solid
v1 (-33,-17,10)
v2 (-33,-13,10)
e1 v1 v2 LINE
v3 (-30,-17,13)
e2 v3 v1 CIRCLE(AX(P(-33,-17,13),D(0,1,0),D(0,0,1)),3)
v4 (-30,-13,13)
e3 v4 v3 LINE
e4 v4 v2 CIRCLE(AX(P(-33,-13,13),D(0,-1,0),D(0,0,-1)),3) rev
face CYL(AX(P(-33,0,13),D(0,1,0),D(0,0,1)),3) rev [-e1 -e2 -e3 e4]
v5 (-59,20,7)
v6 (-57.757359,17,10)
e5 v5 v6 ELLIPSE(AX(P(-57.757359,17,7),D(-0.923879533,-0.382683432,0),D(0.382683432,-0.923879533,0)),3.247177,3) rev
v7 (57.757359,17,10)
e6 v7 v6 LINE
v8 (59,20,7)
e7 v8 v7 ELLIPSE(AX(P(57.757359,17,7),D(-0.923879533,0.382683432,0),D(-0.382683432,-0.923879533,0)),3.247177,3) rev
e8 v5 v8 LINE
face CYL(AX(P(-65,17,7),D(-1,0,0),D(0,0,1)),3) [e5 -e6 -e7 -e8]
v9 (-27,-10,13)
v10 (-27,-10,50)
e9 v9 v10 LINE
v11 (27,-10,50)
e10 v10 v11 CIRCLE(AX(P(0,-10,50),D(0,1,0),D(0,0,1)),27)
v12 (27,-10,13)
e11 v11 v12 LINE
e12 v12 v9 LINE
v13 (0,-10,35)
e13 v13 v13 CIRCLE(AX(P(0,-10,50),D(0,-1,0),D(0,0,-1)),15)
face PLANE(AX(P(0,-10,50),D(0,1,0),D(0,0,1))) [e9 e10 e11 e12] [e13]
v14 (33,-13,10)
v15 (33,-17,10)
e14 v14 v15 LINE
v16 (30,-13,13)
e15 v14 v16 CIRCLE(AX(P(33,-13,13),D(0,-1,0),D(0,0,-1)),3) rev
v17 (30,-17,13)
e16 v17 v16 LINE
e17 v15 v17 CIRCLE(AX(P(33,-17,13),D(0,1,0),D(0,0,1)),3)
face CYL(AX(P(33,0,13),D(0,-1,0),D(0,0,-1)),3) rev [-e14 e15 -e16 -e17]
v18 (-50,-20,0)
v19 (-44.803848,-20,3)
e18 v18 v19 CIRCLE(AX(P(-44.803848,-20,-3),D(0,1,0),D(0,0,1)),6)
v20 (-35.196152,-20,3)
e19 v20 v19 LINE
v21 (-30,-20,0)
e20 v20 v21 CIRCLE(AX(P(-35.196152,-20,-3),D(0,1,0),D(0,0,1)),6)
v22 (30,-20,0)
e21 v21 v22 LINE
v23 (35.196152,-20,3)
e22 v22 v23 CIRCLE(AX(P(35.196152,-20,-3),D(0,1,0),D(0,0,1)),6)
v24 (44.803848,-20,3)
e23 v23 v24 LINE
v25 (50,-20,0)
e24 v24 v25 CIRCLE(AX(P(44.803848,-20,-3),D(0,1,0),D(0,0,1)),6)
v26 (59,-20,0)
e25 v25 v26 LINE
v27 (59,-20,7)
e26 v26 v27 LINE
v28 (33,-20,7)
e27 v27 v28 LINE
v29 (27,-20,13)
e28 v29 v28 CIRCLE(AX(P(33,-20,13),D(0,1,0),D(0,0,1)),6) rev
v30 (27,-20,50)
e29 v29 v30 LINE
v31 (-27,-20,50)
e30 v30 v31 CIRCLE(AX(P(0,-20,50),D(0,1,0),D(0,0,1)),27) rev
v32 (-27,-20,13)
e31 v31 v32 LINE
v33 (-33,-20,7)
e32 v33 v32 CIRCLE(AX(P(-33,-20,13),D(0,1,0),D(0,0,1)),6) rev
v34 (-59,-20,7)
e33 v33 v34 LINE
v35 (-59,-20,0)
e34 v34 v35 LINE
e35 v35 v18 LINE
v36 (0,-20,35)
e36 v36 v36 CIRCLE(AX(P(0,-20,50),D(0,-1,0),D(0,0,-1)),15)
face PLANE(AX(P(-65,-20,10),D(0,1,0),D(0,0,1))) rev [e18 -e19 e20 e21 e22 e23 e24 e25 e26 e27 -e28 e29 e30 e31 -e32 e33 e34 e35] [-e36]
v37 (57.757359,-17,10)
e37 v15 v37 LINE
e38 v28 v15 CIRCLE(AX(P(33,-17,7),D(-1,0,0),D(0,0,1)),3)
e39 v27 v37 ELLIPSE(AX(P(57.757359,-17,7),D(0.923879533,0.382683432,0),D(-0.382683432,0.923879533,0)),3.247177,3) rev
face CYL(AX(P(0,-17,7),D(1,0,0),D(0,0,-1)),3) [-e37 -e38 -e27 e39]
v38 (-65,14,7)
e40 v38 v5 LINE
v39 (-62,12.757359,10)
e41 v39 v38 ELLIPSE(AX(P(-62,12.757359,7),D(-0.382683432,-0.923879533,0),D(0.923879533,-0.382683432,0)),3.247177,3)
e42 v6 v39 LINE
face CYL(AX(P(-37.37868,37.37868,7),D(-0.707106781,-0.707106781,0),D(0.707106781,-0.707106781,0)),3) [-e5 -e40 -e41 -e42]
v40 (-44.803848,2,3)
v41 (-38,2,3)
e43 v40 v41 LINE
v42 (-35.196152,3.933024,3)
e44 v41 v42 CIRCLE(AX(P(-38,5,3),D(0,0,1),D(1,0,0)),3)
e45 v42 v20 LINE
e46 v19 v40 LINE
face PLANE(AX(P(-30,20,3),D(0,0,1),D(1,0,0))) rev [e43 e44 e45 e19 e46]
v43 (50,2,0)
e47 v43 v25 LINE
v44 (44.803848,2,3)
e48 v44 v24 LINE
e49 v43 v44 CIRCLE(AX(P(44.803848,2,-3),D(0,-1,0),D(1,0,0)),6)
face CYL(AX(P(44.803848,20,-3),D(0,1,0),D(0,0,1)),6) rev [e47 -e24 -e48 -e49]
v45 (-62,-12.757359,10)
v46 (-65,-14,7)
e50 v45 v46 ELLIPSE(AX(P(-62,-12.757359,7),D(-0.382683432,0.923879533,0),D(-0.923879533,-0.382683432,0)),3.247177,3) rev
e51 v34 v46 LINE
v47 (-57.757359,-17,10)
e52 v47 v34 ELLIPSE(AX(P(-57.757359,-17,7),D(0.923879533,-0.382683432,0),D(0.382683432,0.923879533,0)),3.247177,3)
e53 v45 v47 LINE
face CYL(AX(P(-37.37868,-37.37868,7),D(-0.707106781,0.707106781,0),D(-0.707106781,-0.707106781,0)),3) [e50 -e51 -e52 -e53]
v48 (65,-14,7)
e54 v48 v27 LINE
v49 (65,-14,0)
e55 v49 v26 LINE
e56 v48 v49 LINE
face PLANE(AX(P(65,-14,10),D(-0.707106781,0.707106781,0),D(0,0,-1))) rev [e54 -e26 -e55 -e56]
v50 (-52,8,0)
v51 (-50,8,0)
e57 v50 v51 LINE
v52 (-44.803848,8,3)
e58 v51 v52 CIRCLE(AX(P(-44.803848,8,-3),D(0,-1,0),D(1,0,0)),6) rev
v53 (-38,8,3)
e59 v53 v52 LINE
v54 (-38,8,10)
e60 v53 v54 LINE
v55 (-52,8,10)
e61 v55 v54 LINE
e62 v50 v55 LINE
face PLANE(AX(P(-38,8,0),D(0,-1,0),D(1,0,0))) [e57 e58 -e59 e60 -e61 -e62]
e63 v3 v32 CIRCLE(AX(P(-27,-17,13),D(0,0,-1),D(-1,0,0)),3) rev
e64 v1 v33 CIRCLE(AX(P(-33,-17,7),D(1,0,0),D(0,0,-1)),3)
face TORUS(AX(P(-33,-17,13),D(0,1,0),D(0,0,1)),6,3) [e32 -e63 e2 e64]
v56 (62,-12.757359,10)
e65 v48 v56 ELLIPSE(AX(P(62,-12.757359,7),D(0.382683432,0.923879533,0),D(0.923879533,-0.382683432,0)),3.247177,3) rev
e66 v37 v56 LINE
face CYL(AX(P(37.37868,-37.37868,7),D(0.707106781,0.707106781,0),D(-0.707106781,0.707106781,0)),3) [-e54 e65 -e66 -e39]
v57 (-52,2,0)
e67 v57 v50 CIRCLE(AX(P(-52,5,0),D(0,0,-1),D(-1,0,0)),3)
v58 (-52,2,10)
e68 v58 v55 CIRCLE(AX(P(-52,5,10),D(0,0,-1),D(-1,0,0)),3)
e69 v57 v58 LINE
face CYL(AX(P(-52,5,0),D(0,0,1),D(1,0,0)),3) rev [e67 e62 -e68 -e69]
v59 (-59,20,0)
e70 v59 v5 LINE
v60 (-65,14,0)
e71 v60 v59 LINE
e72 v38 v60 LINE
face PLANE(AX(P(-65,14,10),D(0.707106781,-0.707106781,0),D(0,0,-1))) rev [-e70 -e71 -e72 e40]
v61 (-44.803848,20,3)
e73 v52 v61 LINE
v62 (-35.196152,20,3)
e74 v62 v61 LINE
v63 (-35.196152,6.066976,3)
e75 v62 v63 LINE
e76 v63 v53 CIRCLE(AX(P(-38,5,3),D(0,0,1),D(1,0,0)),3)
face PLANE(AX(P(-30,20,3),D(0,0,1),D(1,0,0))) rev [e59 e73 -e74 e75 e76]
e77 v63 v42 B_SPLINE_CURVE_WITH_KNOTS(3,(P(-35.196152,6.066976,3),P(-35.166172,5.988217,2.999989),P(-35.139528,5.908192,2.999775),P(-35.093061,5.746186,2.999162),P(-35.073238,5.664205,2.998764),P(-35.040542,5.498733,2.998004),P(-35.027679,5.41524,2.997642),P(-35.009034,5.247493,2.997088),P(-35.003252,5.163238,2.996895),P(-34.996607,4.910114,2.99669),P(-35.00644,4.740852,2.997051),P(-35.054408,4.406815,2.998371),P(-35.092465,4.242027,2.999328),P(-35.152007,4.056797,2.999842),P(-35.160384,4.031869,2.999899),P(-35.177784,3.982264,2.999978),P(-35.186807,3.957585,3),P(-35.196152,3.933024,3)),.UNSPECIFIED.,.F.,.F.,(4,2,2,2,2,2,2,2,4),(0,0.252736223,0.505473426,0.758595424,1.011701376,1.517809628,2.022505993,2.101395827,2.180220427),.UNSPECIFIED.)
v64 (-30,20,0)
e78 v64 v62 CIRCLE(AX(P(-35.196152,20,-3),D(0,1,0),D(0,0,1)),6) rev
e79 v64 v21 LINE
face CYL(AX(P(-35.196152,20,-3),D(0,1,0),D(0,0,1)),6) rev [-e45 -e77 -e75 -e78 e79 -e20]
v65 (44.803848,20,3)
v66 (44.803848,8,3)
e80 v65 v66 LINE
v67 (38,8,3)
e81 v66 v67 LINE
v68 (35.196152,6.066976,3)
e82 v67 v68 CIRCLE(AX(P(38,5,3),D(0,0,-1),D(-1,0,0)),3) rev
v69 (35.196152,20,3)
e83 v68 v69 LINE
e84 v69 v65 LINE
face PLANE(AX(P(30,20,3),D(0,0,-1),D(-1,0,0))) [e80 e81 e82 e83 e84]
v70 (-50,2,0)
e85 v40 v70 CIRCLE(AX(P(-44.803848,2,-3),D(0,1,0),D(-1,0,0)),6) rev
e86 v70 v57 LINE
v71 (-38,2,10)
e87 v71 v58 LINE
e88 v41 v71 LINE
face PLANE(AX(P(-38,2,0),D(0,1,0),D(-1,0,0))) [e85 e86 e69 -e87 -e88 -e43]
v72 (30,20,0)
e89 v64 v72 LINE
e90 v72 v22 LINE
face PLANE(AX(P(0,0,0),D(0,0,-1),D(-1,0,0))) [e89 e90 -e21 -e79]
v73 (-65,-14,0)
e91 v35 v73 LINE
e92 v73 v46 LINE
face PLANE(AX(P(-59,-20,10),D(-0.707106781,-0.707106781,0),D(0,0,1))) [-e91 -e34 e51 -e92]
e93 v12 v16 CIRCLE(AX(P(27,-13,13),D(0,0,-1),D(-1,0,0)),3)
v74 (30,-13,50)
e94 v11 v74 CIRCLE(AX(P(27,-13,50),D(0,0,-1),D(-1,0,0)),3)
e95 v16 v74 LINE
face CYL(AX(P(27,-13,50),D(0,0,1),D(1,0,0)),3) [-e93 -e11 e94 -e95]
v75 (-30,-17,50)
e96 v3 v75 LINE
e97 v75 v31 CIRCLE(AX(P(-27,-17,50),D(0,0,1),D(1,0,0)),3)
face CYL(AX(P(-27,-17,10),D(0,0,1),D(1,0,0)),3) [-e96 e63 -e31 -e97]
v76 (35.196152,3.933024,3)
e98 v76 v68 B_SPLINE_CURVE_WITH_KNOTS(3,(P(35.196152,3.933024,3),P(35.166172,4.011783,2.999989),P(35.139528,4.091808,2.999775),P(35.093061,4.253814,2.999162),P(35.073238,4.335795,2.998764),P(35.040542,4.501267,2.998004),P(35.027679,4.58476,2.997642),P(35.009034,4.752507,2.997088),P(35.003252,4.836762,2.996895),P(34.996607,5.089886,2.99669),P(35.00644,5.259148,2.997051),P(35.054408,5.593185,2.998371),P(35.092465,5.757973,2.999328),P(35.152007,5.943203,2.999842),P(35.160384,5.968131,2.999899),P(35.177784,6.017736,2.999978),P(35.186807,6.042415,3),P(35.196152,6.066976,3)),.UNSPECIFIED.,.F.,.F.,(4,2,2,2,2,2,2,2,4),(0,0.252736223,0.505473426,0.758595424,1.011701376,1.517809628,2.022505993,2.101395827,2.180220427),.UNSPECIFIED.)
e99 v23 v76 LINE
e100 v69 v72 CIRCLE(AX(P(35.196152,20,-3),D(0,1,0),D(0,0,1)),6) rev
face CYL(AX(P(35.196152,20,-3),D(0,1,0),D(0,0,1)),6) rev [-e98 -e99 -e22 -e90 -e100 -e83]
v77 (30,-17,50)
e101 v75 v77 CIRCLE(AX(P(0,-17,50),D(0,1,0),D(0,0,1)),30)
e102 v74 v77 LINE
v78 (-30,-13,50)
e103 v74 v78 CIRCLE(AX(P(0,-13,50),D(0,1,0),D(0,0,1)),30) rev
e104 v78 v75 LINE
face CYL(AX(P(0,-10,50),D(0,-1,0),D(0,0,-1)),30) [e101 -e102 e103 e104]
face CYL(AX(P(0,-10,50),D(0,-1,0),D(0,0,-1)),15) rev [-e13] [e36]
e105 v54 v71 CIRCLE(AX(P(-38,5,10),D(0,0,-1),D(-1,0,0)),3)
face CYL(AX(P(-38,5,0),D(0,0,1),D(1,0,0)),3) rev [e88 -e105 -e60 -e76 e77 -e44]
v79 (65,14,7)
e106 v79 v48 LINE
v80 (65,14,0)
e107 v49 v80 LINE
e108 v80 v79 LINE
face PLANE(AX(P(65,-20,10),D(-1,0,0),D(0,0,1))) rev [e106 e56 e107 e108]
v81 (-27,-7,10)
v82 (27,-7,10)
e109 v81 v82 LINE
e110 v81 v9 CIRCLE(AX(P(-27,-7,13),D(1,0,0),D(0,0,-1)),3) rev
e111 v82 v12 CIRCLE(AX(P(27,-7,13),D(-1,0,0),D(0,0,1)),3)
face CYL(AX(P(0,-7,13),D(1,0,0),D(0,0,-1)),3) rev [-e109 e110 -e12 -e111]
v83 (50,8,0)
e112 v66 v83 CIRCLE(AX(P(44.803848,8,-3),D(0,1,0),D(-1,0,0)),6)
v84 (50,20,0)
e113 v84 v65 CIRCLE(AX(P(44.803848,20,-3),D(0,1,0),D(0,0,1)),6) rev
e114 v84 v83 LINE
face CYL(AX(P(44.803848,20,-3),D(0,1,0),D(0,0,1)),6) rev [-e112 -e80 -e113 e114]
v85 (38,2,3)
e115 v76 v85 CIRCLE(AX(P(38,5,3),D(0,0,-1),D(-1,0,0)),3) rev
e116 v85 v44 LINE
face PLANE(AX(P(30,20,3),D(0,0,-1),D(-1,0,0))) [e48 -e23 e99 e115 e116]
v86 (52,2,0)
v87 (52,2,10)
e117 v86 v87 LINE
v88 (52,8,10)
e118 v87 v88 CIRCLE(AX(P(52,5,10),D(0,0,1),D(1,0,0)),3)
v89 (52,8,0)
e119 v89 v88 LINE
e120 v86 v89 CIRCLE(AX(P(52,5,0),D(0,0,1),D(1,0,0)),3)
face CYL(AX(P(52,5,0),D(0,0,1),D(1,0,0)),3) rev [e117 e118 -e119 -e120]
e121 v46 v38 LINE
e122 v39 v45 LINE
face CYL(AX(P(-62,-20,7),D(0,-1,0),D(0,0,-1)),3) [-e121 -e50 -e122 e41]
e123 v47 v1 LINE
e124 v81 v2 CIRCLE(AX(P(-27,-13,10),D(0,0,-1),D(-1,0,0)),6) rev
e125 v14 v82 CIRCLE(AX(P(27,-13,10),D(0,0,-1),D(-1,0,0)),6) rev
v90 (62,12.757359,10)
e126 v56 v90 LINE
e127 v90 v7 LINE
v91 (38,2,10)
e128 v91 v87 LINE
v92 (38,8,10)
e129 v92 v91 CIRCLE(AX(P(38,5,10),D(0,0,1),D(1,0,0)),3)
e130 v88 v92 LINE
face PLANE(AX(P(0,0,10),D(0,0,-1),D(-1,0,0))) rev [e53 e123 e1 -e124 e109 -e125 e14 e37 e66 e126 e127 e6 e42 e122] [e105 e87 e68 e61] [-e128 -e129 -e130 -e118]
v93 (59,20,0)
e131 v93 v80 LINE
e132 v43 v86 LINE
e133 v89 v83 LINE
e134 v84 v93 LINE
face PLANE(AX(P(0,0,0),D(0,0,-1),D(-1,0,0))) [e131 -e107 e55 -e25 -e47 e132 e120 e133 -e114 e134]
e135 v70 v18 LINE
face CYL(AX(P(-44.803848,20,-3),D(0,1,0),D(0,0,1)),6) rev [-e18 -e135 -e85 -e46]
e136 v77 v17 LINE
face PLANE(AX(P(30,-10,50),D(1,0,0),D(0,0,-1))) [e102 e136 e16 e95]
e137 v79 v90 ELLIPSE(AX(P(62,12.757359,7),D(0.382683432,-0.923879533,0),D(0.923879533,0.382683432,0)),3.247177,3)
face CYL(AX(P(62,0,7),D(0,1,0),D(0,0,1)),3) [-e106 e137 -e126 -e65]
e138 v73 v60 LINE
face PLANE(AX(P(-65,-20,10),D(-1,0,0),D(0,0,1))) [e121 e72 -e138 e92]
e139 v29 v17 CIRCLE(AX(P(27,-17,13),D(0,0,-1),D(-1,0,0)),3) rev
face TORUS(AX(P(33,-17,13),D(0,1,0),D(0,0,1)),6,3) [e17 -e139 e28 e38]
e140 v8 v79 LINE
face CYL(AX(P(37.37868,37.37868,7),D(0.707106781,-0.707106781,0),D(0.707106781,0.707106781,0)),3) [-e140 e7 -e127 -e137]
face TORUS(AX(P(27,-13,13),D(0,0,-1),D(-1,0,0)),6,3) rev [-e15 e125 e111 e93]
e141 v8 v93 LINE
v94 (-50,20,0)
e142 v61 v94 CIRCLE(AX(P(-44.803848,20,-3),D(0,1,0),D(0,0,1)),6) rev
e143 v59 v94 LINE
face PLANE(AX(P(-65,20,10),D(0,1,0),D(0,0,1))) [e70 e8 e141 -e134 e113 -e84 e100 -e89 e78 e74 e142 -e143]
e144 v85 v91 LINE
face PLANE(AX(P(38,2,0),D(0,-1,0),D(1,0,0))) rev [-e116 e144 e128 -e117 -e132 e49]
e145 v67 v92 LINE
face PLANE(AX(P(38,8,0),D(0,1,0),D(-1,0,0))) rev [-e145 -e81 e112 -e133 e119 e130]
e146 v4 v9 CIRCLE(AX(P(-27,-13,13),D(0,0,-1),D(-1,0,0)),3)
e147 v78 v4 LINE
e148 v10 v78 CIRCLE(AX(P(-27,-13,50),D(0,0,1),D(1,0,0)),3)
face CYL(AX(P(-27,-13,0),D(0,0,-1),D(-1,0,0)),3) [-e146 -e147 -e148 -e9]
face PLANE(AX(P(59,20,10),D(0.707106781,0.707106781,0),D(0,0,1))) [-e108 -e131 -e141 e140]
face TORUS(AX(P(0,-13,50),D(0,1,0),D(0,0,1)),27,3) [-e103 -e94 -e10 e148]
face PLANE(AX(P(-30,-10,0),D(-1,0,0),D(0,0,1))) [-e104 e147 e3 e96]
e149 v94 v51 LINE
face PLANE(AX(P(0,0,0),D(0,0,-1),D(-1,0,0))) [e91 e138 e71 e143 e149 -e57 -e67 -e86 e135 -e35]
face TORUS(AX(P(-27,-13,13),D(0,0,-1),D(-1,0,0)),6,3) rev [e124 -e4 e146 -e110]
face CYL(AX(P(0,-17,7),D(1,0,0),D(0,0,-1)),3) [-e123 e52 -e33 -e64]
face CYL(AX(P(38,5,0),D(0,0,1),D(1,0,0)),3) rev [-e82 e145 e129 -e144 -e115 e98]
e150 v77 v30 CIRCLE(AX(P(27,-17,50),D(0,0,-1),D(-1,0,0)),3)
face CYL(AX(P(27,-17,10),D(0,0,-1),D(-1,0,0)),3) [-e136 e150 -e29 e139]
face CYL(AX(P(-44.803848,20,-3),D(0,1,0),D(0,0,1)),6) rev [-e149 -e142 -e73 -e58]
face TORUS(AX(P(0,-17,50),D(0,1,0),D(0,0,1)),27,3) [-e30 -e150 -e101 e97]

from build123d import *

# Parameters (mm, degrees)
ESQUISSE1_W             = 130
ESQUISSE1_H             = 40
BOSS_EXTRU_1_DEPTH      = 10
ESQUISSE2_R             = 15
BOSS_EXTRU_2_DEPTH      = 10
ENL_V_MAT_EXTRU_1_DEPTH = 98.59610648
ESQUISSE4_W             = 20
ESQUISSE4_H             = 3
ENL_V_MAT_EXTRU_2_DEPTH = 111.566721937
CONG_1_R                = 6
CONG_1_OF_SYM_TRIE2_R   = 6
CHANFREIN1_SIZE         = 6
CONG_2_R                = 3


with BuildPart() as part:
    # Esquisse1 → Boss.-Extru.1 (new body)
    with BuildSketch(Plane.XY):
        Rectangle(ESQUISSE1_W, ESQUISSE1_H)
    extrude(amount=BOSS_EXTRU_1_DEPTH)

    # Esquisse2 → Boss.-Extru.2 (add)
    with BuildSketch(Plane.XZ.offset(20)):
        with BuildLine():
            Line((-30, 0), (-30, 50))
            ThreePointArc((-30, 50), (0, 80), (30, 50))
            Line((30, 50), (30, 0))
            Line((30, 0), (-30, 0))
        make_face()
        with Locations(Location((0, 50, 0), (0, 0, 270))):
            Circle(ESQUISSE2_R, mode=Mode.SUBTRACT)
    extrude(amount=-BOSS_EXTRU_2_DEPTH)

    # Esquisse3 → Enlèv. mat.-Extru.1 (cut, through all)
    with BuildSketch(Plane.XY.offset(10)):
        with BuildLine():
            Line((38, 8), (52, 8))
            ThreePointArc((52, 8), (55, 5), (52, 2))
            Line((52, 2), (38, 2))
            ThreePointArc((38, 2), (35, 5), (38, 8))
        make_face()
    enl_v_mat_extru_1 = extrude(amount=-ENL_V_MAT_EXTRU_1_DEPTH, mode=Mode.SUBTRACT)

    # Symétrie1: Enlèv. mat.-Extru.1 across plane
    add(enl_v_mat_extru_1.mirror(Plane(origin=(0, 0, 0), x_dir=(0, 0, 1), z_dir=(1, 0, 0))), mode=Mode.SUBTRACT)

    # Esquisse4 → Enlèv. mat.-Extru.2 (cut, through all)
    with BuildSketch(Plane.XZ.offset(20)):
        with Locations((40, 1.5)):
            Rectangle(ESQUISSE4_W, ESQUISSE4_H)
    enl_v_mat_extru_2 = extrude(amount=-ENL_V_MAT_EXTRU_2_DEPTH, mode=Mode.SUBTRACT)

    # Congé1
    # the kernel refuses this fillet: 6 mm, written as the material it adds along each edge
    with BuildSketch(Plane(origin=(50, -20, 3), x_dir=(-1, 0, 0), z_dir=(0, 1, 0))) as cong_1_piece_1:
        with BuildLine():
            CenterArc((5.196152423, -6), CONG_1_R, 90, 60)
            Line((0, -3), (-0.103923048, -2.94))
            ThreePointArc((-0.103923048, -2.94), (-0.12, -1.5), (-0.12, 0))
            Line((-0.12, 0), (0, 0.12))
            Line((0, 0.12), (5.196152423, 0.12))
            Line((5.196152423, 0.12), (5.196152423, 0))
        make_face()
    extrude(amount=22)
    with BuildSketch(Plane(origin=(50, -20, 3), x_dir=(-1, 0, 0), z_dir=(0, 1, 0))) as cong_1_piece_2_section:
        with BuildLine():
            CenterArc((5.196152423, -6), CONG_1_R, 90, 60)
            Line((0, -3), (-0.103923048, -2.94))
            ThreePointArc((-0.103923048, -2.94), (-0.12, -1.5), (-0.12, 0))
            Line((-0.12, 0), (0, 0.12))
            Line((0, 0.12), (5.196152423, 0.12))
            Line((5.196152423, 0.12), (5.196152423, 0))
        make_face()
    cong_1_piece_2 = extrude(amount=34.990381057, mode=Mode.PRIVATE)
    cong_1_piece_2 = split(cong_1_piece_2, bisect_by=Plane(origin=(48.702137325, 8, 2.222899734), z_dir=(0, 1, 0)), keep=Keep.TOP, mode=Mode.PRIVATE)
    add(cong_1_piece_2)
    with BuildSketch(Plane(origin=(50, -4.990381057, 3), x_dir=(-1, 0, 0), z_dir=(0, 1, 0))) as cong_1_piece_3_section:
        with BuildLine():
            CenterArc((5.196152423, -6), CONG_1_R, 90, 60)
            Line((0, -3), (-0.103923048, -2.94))
            ThreePointArc((-0.103923048, -2.94), (-0.12, -1.5), (-0.12, 0))
            Line((-0.12, 0), (0, 0.12))
            Line((0, 0.12), (5.196152423, 0.12))
            Line((5.196152423, 0.12), (5.196152423, 0))
        make_face()
    cong_1_piece_3 = extrude(amount=24.990381057, mode=Mode.PRIVATE)
    cong_1_piece_3 = split(cong_1_piece_3, bisect_by=Plane(origin=(48.702137325, 2, 2.222899734), z_dir=(0, -1, 0)), keep=Keep.TOP, mode=Mode.PRIVATE)
    add(cong_1_piece_3)
    with BuildSketch(Plane(origin=(50, 8, 3), x_dir=(-1, 0, 0), z_dir=(0, 1, 0))) as cong_1_piece_4:
        with BuildLine():
            CenterArc((5.196152423, -6), CONG_1_R, 90, 60)
            Line((0, -3), (-0.103923048, -2.94))
            ThreePointArc((-0.103923048, -2.94), (-0.12, -1.5), (-0.12, 0))
            Line((-0.12, 0), (0, 0.12))
            Line((0, 0.12), (5.196152423, 0.12))
            Line((5.196152423, 0.12), (5.196152423, 0))
        make_face()
    extrude(amount=12)
    with BuildSketch(Plane(origin=(30, -20, 3), x_dir=(0, 0, -1), z_dir=(0, 1, 0))) as cong_1_piece_5_section:
        with BuildLine():
            CenterArc((6, -5.196152423), CONG_1_R, 120, 60)
            Line((0, -5.196152423), (-0.12, -5.196152423))
            Line((-0.12, -5.196152423), (-0.12, 0))
            Line((-0.12, 0), (0, 0.12))
            ThreePointArc((0, 0.12), (1.5, 0.12), (2.94, 0.103923048))
            Line((2.94, 0.103923048), (3, 0))
        make_face()
    cong_1_piece_5 = extrude(amount=40, mode=Mode.PRIVATE)
    cong_1_piece_5 = cong_1_piece_5 - Plane(origin=(38, 5, 2.222770997), x_dir=(0, -1, 0), z_dir=(0, 0, 1)) * Cylinder(3, 101, mode=Mode.PRIVATE)
    add(cong_1_piece_5)

    # Symétrie2: Enlèv. mat.-Extru.2 across plane
    add(enl_v_mat_extru_2.mirror(Plane(origin=(0, 0, 0), x_dir=(0, 0, 1), z_dir=(1, 0, 0))), mode=Mode.SUBTRACT)

    # Congé1 of Symétrie2
    # the kernel refuses this fillet: 6 mm, written as the material it adds along each edge
    with BuildSketch(Plane(origin=(-50, -20, 3), x_dir=(1, 0, 0), z_dir=(0, 1, 0))) as cong_1_of_sym_trie2_piece_1:
        with BuildLine():
            CenterArc((5.196152423, 6), CONG_1_OF_SYM_TRIE2_R, 210, 60)
            Line((0, 3), (-0.103923048, 2.94))
            ThreePointArc((-0.103923048, 2.94), (-0.12, 1.5), (-0.12, 0))
            Line((-0.12, 0), (0, -0.12))
            Line((0, -0.12), (5.196152423, -0.12))
            Line((5.196152423, -0.12), (5.196152423, 0))
        make_face()
    extrude(amount=22)
    with BuildSketch(Plane(origin=(-50, -20, 3), x_dir=(1, 0, 0), z_dir=(0, 1, 0))) as cong_1_of_sym_trie2_piece_2_section:
        with BuildLine():
            CenterArc((5.196152423, 6), CONG_1_OF_SYM_TRIE2_R, 210, 60)
            Line((0, 3), (-0.103923048, 2.94))
            ThreePointArc((-0.103923048, 2.94), (-0.12, 1.5), (-0.12, 0))
            Line((-0.12, 0), (0, -0.12))
            Line((0, -0.12), (5.196152423, -0.12))
            Line((5.196152423, -0.12), (5.196152423, 0))
        make_face()
    cong_1_of_sym_trie2_piece_2 = extrude(amount=34.990381057, mode=Mode.PRIVATE)
    cong_1_of_sym_trie2_piece_2 = split(cong_1_of_sym_trie2_piece_2, bisect_by=Plane(origin=(-48.702137325, 8, 2.222899734), z_dir=(0, 1, 0)), keep=Keep.TOP, mode=Mode.PRIVATE)
    add(cong_1_of_sym_trie2_piece_2)
    with BuildSketch(Plane(origin=(-50, -4.990381057, 3), x_dir=(1, 0, 0), z_dir=(0, 1, 0))) as cong_1_of_sym_trie2_piece_3_section:
        with BuildLine():
            CenterArc((5.196152423, 6), CONG_1_OF_SYM_TRIE2_R, 210, 60)
            Line((0, 3), (-0.103923048, 2.94))
            ThreePointArc((-0.103923048, 2.94), (-0.12, 1.5), (-0.12, 0))
            Line((-0.12, 0), (0, -0.12))
            Line((0, -0.12), (5.196152423, -0.12))
            Line((5.196152423, -0.12), (5.196152423, 0))
        make_face()
    cong_1_of_sym_trie2_piece_3 = extrude(amount=24.990381057, mode=Mode.PRIVATE)
    cong_1_of_sym_trie2_piece_3 = split(cong_1_of_sym_trie2_piece_3, bisect_by=Plane(origin=(-48.702137325, 2, 2.222899734), z_dir=(0, -1, 0)), keep=Keep.TOP, mode=Mode.PRIVATE)
    add(cong_1_of_sym_trie2_piece_3)
    with BuildSketch(Plane(origin=(-50, 8, 3), x_dir=(1, 0, 0), z_dir=(0, 1, 0))) as cong_1_of_sym_trie2_piece_4:
        with BuildLine():
            CenterArc((5.196152423, 6), CONG_1_OF_SYM_TRIE2_R, 210, 60)
            Line((0, 3), (-0.103923048, 2.94))
            ThreePointArc((-0.103923048, 2.94), (-0.12, 1.5), (-0.12, 0))
            Line((-0.12, 0), (0, -0.12))
            Line((0, -0.12), (5.196152423, -0.12))
            Line((5.196152423, -0.12), (5.196152423, 0))
        make_face()
    extrude(amount=12)
    with BuildSketch(Plane(origin=(-30, -20, 3), x_dir=(0, 0, -1), z_dir=(0, 1, 0))) as cong_1_of_sym_trie2_piece_5_section:
        with BuildLine():
            CenterArc((6, 5.196152423), CONG_1_OF_SYM_TRIE2_R, 180, 60)
            Line((0, 5.196152423), (-0.12, 5.196152423))
            Line((-0.12, 5.196152423), (-0.12, 0))
            Line((-0.12, 0), (0, -0.12))
            ThreePointArc((0, -0.12), (1.5, -0.12), (2.94, -0.103923048))
            Line((2.94, -0.103923048), (3, 0))
        make_face()
    cong_1_of_sym_trie2_piece_5 = extrude(amount=40, mode=Mode.PRIVATE)
    cong_1_of_sym_trie2_piece_5 = cong_1_of_sym_trie2_piece_5 - Plane(origin=(-38, 5, 2.222770997), x_dir=(0, -1, 0), z_dir=(0, 0, 1)) * Cylinder(3, 101, mode=Mode.PRIVATE)
    add(cong_1_of_sym_trie2_piece_5)

    # Chanfrein1
    chanfrein1_edges = [part.edges().sort_by_distance(p)[0] for p in [
        (-65, -20, 5),
        (65, -20, 5),
        (65, 20, 5),
        (-65, 20, 5),
    ]]
    chamfer(chanfrein1_edges, length=CHANFREIN1_SIZE)

    # Congé2
    cong_2_edges = [part.edges().sort_by_distance(p)[0] for p in [
        (-65, 0, 10),
        (0, 20, 10),
        (-44.5, -20, 10),
        (65, 0, 10),
        (-62, -17, 10),
        (62, -17, 10),
        (62, 17, 10),
        (-62, 17, 10),
        (44.5, -20, 10),
        (-30, -10, 30),
        (30, -10, 30),
        (-30, -20, 30),
        (30, -20, 30),
        (0, -20, 80),
        (-30, -15, 10),
        (0, -10, 80),
        (30, -15, 10),
        (0, -10, 10),
    ]]
    fillet(cong_2_edges, radius=CONG_2_R)


solid = part.part
